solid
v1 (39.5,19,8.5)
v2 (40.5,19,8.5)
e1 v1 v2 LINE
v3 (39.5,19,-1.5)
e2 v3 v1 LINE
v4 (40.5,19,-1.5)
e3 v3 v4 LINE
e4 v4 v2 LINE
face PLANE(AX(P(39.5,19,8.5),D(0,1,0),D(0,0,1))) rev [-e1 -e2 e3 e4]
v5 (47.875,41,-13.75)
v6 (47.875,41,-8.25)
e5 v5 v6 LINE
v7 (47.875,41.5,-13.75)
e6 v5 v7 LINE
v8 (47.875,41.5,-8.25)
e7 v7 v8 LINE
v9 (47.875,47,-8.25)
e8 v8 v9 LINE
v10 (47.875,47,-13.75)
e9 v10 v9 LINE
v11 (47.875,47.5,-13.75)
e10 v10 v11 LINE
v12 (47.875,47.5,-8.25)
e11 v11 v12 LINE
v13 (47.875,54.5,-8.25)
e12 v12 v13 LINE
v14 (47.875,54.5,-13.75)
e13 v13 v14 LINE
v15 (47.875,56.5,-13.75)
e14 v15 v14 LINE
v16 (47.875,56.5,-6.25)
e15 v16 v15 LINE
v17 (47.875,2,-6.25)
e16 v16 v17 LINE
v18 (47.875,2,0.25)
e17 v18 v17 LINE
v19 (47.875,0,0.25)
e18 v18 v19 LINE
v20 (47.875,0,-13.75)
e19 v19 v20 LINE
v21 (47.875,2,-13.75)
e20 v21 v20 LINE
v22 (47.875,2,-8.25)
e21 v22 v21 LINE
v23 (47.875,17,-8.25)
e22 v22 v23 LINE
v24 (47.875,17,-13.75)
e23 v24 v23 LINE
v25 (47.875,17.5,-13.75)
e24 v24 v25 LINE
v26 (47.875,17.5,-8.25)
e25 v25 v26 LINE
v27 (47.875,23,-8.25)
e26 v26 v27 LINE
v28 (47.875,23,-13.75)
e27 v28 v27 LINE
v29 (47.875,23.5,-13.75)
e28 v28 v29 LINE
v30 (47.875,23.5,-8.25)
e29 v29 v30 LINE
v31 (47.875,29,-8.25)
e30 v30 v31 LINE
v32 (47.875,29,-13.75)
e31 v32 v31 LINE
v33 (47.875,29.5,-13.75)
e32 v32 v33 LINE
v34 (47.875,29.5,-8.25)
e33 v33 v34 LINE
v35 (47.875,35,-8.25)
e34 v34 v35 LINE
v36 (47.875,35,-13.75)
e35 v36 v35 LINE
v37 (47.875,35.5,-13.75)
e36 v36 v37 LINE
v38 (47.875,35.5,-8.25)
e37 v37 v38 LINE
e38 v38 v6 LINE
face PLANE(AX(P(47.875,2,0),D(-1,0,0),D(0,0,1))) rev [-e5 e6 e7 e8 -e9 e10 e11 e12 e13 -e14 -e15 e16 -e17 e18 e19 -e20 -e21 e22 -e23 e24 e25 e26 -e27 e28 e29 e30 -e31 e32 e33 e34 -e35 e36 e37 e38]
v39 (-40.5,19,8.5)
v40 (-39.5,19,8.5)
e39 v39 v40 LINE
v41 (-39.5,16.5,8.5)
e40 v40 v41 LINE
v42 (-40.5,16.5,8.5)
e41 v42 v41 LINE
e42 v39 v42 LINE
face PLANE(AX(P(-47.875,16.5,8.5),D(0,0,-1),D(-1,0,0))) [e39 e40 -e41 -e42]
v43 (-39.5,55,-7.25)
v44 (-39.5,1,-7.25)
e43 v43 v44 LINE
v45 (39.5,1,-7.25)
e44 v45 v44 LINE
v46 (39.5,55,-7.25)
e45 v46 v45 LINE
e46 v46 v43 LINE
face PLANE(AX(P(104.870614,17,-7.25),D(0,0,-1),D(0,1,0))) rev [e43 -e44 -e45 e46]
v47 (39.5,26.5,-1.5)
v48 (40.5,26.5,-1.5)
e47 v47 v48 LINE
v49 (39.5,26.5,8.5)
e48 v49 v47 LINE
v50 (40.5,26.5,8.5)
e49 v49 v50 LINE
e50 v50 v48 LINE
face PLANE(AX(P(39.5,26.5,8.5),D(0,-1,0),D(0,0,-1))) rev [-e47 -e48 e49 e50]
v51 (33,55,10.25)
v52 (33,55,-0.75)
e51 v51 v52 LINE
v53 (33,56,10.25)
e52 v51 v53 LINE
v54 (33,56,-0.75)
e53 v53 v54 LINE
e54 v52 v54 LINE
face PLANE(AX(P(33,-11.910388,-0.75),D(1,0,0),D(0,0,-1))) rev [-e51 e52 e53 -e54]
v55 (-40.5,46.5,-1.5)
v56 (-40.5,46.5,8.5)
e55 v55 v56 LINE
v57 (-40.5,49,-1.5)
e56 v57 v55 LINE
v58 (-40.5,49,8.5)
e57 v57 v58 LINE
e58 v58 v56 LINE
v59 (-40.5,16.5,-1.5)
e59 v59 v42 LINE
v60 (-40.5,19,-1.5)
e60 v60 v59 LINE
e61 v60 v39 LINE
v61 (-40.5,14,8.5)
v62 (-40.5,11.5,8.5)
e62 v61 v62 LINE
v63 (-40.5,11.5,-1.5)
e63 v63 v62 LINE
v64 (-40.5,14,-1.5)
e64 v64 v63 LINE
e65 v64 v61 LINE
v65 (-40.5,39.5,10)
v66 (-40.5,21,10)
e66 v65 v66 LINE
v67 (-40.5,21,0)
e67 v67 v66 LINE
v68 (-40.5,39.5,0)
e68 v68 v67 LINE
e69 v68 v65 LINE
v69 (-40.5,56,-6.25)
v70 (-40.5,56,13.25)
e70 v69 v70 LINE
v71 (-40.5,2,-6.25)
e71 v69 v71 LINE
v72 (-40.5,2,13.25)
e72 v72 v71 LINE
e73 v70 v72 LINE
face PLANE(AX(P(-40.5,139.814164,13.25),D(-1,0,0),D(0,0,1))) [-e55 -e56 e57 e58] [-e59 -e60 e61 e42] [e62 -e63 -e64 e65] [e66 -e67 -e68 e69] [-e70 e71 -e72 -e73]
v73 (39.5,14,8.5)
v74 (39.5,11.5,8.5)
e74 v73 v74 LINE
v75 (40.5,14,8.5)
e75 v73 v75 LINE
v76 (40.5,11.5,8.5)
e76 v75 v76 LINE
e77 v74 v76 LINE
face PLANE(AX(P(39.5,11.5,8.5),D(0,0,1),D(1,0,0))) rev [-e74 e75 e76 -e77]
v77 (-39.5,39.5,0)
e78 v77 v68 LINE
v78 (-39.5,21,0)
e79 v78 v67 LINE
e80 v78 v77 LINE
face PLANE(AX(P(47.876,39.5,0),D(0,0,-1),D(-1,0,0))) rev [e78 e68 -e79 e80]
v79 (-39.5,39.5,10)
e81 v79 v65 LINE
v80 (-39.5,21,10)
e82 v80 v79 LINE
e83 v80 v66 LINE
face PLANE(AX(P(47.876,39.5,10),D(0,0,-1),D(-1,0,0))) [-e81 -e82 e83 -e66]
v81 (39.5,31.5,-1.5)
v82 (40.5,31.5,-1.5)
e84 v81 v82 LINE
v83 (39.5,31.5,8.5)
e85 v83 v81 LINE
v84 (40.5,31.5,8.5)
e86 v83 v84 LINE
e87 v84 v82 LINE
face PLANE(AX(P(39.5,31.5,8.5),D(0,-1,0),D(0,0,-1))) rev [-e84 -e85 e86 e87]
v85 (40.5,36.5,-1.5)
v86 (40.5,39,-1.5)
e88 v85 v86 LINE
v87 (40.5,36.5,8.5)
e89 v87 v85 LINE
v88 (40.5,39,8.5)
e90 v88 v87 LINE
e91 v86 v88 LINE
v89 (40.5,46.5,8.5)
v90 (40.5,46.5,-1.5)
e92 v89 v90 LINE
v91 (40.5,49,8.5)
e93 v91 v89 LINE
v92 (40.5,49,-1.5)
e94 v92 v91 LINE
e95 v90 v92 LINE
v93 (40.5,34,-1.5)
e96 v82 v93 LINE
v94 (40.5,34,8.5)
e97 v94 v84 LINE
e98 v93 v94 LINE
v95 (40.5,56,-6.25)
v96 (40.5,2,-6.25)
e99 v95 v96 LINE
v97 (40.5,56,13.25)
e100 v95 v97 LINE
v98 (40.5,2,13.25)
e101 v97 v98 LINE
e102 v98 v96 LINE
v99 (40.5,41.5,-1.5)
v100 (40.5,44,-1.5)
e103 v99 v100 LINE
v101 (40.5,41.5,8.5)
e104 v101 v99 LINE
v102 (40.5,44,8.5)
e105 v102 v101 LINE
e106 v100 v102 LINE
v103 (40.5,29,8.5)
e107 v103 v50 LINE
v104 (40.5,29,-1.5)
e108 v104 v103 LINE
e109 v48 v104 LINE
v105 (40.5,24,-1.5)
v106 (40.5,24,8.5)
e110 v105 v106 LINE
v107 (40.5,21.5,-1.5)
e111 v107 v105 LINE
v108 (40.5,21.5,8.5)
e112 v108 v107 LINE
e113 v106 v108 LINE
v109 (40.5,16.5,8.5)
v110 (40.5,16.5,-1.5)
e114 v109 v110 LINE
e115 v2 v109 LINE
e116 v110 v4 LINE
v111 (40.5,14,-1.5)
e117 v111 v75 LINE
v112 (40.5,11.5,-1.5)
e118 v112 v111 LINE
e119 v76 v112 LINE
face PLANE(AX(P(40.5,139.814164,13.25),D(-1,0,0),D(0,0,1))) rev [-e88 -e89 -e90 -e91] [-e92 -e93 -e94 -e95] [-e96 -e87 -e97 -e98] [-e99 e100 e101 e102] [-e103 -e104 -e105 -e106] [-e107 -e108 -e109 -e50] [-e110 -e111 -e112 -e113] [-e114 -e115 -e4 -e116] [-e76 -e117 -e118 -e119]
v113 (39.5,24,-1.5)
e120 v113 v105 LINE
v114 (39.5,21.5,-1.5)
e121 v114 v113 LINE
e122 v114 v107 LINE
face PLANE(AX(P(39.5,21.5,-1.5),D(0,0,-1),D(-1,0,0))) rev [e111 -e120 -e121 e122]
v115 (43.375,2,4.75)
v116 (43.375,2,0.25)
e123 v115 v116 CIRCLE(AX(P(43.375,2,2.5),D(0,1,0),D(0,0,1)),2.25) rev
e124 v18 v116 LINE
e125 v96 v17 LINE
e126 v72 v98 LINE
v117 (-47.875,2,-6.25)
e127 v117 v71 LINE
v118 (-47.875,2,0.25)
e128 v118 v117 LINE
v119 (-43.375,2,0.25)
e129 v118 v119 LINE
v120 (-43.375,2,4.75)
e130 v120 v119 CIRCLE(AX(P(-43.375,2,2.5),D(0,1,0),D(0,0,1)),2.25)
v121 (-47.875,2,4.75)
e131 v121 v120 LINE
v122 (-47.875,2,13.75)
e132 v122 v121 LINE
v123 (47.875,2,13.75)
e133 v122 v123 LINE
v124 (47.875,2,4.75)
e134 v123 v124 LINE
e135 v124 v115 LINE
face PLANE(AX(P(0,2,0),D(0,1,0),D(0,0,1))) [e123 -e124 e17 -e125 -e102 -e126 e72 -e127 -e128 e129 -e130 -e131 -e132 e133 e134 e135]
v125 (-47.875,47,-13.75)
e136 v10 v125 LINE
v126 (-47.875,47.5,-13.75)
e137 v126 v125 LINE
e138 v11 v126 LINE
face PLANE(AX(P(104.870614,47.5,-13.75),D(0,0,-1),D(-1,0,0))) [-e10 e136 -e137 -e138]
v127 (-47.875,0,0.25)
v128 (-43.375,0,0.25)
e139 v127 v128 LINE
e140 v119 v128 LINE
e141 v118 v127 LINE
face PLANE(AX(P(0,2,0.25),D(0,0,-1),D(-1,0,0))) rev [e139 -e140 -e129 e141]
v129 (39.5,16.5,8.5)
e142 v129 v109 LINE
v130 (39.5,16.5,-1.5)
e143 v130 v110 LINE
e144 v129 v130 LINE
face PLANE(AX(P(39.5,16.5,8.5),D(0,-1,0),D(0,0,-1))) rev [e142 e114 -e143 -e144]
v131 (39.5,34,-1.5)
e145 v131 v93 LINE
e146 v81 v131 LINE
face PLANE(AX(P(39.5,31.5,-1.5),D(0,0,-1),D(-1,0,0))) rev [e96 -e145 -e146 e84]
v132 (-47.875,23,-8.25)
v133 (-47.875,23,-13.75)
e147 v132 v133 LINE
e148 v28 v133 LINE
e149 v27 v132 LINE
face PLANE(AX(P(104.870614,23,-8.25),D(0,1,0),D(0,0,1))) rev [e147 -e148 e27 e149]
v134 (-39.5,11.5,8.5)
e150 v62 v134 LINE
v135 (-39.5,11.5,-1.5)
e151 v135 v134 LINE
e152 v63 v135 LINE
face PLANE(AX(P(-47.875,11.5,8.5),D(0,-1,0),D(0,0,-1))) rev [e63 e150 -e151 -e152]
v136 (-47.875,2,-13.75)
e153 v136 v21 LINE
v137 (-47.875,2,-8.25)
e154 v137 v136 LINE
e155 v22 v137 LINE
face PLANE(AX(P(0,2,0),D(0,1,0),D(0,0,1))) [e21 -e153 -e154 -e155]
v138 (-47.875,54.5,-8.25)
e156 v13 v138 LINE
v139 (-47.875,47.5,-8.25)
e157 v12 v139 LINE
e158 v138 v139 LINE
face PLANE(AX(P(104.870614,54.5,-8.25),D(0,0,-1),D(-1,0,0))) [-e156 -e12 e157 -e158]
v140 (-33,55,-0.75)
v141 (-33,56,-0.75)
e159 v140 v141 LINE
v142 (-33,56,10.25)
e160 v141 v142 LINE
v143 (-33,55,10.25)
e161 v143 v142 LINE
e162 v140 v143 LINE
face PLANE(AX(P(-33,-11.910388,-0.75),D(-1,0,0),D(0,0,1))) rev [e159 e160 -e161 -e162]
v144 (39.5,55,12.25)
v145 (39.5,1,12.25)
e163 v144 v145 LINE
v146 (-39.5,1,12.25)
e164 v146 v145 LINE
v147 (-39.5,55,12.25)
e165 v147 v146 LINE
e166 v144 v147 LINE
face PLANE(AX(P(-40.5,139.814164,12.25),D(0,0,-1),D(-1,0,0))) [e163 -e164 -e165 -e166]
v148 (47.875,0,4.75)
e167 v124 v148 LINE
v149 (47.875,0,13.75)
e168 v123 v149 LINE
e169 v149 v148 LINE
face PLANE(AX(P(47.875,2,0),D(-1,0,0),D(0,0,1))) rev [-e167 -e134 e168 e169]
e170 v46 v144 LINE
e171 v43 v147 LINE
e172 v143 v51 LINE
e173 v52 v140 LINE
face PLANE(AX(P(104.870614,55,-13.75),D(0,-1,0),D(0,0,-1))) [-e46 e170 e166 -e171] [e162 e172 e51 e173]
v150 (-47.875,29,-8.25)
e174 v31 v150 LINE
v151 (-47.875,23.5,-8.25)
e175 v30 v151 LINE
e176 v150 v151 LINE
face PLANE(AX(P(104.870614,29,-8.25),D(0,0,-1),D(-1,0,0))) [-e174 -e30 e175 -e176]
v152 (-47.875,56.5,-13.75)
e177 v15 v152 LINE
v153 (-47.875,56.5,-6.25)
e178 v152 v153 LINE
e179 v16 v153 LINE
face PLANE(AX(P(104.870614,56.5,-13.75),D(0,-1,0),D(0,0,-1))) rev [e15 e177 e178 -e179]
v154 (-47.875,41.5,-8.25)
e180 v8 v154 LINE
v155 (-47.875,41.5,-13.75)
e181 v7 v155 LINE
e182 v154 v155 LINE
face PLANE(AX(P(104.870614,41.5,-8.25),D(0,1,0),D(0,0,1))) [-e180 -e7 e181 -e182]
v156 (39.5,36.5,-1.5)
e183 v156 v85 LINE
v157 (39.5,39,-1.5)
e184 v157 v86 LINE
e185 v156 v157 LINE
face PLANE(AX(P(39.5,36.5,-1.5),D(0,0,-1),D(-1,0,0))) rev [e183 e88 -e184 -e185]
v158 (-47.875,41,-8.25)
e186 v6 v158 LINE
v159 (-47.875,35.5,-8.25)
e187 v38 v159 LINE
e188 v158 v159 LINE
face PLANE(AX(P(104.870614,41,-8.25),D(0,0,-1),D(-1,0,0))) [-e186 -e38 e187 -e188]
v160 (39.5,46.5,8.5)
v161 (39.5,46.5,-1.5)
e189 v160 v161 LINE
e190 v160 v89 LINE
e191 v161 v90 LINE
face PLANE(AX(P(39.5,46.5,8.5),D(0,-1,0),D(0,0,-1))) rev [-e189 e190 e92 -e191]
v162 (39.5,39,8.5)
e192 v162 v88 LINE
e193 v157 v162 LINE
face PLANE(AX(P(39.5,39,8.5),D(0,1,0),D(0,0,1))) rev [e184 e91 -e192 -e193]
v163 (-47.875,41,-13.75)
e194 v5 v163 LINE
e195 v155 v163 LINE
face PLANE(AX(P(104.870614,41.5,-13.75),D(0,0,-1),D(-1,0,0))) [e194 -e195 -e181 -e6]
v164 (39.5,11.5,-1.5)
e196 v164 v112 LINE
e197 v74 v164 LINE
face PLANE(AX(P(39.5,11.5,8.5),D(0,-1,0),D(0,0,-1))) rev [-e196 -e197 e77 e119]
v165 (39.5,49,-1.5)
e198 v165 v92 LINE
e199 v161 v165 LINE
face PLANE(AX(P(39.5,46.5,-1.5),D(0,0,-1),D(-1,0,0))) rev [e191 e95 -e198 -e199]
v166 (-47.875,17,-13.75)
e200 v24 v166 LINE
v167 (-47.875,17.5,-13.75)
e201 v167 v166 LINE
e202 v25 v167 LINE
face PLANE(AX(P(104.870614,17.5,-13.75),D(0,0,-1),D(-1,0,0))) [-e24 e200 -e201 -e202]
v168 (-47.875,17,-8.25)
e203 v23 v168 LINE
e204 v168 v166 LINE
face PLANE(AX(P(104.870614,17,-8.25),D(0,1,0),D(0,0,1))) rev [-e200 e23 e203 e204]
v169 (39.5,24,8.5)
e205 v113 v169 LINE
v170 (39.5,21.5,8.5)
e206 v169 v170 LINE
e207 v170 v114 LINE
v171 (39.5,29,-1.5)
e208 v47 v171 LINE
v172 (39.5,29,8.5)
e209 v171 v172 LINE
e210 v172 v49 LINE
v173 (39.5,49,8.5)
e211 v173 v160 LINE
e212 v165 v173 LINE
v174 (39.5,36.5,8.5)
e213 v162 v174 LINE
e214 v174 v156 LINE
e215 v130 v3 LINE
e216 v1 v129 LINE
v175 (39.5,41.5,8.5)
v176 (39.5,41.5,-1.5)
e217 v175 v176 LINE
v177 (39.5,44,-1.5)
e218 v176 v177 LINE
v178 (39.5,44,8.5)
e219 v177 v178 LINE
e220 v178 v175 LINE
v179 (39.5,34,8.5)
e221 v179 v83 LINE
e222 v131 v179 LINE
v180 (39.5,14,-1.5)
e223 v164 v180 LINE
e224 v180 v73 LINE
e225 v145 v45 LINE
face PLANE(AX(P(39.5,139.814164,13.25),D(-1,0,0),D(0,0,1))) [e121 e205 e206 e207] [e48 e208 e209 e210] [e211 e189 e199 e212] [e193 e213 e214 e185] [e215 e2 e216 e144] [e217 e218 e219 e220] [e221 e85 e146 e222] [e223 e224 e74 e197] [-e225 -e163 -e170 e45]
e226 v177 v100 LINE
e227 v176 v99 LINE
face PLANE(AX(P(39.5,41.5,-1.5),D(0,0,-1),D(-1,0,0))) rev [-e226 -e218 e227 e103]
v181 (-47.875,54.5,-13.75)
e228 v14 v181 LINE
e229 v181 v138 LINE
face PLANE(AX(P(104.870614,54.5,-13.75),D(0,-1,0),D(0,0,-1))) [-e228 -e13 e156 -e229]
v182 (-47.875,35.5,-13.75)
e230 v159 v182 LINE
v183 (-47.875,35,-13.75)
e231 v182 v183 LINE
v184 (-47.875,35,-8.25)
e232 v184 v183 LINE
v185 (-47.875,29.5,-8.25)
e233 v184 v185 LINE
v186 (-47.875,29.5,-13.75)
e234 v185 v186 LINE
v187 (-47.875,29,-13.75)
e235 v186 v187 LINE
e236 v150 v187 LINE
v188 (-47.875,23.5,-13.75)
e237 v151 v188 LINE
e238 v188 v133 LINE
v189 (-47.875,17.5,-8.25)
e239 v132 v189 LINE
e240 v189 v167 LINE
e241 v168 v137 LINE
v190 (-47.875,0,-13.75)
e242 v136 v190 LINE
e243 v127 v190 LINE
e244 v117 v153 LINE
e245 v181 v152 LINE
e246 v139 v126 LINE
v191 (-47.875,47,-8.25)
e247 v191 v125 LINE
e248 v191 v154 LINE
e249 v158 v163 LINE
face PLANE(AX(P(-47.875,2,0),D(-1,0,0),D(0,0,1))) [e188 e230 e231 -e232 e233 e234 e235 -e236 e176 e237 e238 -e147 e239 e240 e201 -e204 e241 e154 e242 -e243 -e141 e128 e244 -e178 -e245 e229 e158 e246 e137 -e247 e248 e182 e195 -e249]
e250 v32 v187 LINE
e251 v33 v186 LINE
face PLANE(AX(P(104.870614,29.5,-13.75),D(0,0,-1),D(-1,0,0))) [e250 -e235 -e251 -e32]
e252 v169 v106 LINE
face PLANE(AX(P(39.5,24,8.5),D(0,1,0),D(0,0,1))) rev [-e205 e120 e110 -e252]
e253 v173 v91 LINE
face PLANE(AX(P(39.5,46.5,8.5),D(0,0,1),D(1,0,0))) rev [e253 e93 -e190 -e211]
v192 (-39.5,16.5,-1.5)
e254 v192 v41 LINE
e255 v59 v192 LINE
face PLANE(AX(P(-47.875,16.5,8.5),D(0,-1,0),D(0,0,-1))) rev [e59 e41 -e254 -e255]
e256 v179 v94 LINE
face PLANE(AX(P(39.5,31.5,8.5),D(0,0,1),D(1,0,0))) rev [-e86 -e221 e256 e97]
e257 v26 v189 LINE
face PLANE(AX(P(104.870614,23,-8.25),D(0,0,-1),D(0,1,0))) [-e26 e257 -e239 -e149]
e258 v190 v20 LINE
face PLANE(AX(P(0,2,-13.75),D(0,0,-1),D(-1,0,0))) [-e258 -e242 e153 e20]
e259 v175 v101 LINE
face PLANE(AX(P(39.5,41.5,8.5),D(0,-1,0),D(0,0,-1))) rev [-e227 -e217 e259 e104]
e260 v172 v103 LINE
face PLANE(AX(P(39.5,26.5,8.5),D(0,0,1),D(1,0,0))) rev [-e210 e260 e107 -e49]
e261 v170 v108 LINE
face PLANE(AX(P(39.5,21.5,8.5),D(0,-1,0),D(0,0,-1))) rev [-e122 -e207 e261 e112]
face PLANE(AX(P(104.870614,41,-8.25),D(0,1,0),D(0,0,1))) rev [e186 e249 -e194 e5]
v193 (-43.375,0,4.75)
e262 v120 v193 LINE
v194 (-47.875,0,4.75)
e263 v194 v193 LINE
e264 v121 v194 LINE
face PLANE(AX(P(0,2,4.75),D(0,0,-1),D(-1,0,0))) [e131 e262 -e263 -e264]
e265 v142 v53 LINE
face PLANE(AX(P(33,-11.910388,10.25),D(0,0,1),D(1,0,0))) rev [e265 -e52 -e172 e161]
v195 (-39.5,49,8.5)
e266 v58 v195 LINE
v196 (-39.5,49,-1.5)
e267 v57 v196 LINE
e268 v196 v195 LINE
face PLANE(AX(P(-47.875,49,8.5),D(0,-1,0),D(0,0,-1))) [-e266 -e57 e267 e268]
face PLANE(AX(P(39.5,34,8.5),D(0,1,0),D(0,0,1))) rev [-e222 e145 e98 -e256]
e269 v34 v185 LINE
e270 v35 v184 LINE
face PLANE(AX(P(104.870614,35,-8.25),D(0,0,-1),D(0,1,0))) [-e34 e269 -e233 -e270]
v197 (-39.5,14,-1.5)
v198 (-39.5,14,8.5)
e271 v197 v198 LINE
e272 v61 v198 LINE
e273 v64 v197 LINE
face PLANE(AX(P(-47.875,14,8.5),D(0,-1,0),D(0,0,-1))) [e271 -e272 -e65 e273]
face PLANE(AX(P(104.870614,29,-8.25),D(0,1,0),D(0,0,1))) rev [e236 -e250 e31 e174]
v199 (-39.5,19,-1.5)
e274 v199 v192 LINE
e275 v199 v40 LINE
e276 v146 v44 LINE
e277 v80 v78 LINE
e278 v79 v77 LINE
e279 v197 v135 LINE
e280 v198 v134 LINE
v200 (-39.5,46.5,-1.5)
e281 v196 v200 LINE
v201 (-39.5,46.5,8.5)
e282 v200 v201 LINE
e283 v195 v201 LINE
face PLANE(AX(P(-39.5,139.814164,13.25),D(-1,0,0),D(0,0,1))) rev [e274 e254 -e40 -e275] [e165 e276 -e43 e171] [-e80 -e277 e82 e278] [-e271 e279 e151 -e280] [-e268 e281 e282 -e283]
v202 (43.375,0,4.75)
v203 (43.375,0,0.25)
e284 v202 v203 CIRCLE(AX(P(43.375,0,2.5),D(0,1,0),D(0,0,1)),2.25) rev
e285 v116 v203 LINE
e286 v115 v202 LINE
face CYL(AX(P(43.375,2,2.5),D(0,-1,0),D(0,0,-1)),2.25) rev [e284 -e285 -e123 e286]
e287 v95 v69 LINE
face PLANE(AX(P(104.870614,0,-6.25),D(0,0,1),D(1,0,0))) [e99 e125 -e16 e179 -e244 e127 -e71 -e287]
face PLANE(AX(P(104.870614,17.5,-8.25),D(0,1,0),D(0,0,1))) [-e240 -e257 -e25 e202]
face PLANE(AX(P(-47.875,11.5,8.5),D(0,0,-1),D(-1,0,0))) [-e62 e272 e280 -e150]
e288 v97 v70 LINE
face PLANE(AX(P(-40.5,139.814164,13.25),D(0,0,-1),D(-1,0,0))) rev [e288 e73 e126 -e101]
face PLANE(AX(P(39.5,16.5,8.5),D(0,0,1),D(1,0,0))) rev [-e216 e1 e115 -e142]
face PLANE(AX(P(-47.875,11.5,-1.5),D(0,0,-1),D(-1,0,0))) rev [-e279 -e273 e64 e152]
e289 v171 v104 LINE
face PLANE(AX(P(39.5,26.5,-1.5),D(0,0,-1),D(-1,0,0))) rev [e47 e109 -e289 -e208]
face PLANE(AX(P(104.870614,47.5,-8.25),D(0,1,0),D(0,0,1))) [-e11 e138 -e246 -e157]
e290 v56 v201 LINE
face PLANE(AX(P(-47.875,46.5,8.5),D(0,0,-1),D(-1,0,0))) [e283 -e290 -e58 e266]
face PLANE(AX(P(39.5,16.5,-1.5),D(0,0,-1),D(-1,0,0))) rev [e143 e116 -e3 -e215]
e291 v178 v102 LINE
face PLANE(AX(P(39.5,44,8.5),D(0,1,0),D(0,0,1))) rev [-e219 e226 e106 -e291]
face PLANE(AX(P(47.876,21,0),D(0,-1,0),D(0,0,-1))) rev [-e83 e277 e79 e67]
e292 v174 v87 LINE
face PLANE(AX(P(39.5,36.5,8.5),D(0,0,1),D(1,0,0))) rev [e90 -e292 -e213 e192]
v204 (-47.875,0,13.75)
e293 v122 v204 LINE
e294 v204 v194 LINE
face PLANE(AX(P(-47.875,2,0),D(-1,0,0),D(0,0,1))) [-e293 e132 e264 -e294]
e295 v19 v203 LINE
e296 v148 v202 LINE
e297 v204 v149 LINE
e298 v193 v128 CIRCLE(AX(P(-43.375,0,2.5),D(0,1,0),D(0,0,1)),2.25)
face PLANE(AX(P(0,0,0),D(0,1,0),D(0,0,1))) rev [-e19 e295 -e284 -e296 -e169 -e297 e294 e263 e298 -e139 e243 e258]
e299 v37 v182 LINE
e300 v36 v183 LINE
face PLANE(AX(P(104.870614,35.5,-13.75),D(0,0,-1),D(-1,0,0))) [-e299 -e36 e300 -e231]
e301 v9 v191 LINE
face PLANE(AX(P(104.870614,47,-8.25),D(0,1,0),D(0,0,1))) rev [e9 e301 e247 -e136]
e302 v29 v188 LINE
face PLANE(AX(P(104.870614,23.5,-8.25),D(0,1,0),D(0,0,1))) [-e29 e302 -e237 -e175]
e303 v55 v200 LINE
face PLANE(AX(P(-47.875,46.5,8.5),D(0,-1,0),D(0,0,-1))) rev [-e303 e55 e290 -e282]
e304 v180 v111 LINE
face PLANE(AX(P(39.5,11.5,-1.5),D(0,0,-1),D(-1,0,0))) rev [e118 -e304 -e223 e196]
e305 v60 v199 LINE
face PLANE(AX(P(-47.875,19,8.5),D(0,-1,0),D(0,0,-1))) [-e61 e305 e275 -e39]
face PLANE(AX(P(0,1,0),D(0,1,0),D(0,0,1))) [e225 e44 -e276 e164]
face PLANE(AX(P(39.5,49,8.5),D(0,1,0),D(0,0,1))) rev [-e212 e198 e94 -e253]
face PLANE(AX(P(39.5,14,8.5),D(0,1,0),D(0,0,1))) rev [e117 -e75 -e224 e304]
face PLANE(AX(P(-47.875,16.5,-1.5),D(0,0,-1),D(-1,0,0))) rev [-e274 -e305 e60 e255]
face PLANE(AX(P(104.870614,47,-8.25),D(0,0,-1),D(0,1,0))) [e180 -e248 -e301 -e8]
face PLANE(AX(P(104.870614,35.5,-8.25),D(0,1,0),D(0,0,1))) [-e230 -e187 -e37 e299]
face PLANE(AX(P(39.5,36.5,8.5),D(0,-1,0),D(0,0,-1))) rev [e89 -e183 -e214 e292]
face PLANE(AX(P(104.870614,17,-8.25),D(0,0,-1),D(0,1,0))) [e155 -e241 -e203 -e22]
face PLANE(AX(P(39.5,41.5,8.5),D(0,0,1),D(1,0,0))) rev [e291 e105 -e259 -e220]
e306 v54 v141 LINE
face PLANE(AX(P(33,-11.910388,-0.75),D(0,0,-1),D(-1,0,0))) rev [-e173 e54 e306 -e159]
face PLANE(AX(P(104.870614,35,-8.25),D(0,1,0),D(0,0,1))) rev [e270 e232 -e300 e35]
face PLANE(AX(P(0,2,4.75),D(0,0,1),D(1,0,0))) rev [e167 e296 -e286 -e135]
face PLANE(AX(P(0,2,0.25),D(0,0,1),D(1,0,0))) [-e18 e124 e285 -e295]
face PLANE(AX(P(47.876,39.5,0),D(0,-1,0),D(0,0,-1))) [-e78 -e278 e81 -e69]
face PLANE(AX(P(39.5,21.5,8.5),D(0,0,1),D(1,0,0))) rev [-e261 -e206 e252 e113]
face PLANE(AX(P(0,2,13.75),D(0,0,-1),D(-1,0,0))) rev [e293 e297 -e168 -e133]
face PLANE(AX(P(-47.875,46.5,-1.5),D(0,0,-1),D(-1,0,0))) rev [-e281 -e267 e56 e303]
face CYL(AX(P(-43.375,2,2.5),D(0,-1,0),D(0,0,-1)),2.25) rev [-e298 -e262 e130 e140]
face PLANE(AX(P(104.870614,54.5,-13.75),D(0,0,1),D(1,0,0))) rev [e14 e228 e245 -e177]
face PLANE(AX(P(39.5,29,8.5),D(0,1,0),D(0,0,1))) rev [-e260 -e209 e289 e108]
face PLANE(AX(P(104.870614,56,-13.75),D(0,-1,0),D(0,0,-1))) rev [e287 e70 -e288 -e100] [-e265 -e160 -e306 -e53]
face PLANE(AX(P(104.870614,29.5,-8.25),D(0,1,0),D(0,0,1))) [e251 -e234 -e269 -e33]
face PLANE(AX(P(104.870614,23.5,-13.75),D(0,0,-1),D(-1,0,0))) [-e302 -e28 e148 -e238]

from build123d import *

# Parameters (mm, degrees)
BOSS_EXTRUDE1_DEPTH = 2
BOSS_EXTRUDE4_DEPTH = 95.75
SKETCH3_W           = 81
SKETCH3_H           = 19.5
BOSS_EXTRUDE5_DEPTH = 54
SKETCH4_W           = 10
SKETCH4_H           = 2.5
CUT_EXTRUDE1_DEPTH  = 1
SHELL1_START        = -39.5
SHELL1_OUTLINE_W    = 54
SHELL1_OUTLINE_H    = 19.5
SHELL1_DEPTH        = 79
SKETCH4_2_W         = 10
SKETCH4_2_H         = 2.5
CUT_EXTRUDE2_DEPTH  = 106.789664547
CUT_EXTRUDE3_REACH  = 107.79
SKETCH5_W           = 10
SKETCH5_H           = 18.5
SKETCH6_W           = 66
SKETCH6_H           = 11
CUT_EXTRUDE4_DEPTH  = 1


# Read off the part's stored shape, not the designer's step: Shell1
with BuildPart() as part:
    # Sketch1 → Boss-Extrude1 (new body)
    with BuildSketch(Plane(origin=(0, 0, 0), x_dir=(1, 0, 0), z_dir=(0, 1, 0))):
        with BuildLine():
            Line((-47.875, -4.75), (-47.875, -13.75))
            Line((-47.875, -13.75), (47.875, -13.75))
            Line((47.875, -13.75), (47.875, -4.75))
            Line((47.875, -4.75), (43.375, -4.75))
            ThreePointArc((43.375, -4.75), (41.125, -2.5), (43.375, -0.25))
            Line((43.375, -0.25), (47.875, -0.25))
            Line((47.875, -0.25), (47.875, 13.75))
            Line((47.875, 13.75), (-47.875, 13.75))
            Line((-47.875, 13.75), (-47.875, -0.25))
            Line((-47.875, -0.25), (-43.375, -0.25))
            ThreePointArc((-43.375, -0.25), (-41.125, -2.5), (-43.375, -4.75))
            Line((-43.375, -4.75), (-47.875, -4.75))
        make_face()
    extrude(amount=BOSS_EXTRUDE1_DEPTH)

    # Sketch2 → Boss-Extrude4 (add)
    with BuildSketch(Plane.ZY.offset(47.875)):
        Polygon((-13.75, 0), (-6.25, 0), (-6.25, 56.5), (-13.75, 56.5), (-13.75, 54.5), (-8.25, 54.5), (-8.25, 47.5), (-13.75, 47.5), (-13.75, 47), (-8.25, 47), (-8.25, 41.5), (-13.75, 41.5), (-13.75, 41), (-8.25, 41), (-8.25, 35.5), (-13.75, 35.5), (-13.75, 35), (-8.25, 35), (-8.25, 29.5), (-13.75, 29.5), (-13.75, 29), (-8.25, 29), (-8.25, 23.5), (-13.75, 23.5), (-13.75, 23), (-8.25, 23), (-8.25, 17.5), (-13.75, 17.5), (-13.75, 17), (-8.25, 17), (-8.25, 2), (-13.75, 2), align=None)
    extrude(amount=-BOSS_EXTRUDE4_DEPTH)

    # Sketch3 → Boss-Extrude5 (add)
    with BuildSketch(Plane(origin=(0, 2, 0), x_dir=(1, 0, 0), z_dir=(0, 1, 0))):
        with Locations((0, -3.5)):
            Rectangle(SKETCH3_W, SKETCH3_H)
    extrude(amount=BOSS_EXTRUDE5_DEPTH)

    # Sketch4 → Cut-Extrude1 (cut)
    with BuildSketch(Plane(origin=(40.5, 0, 0), x_dir=(0, 0, -1), z_dir=(1, 0, 0))):
        with Locations((-3.5, 47.75)):
            Rectangle(SKETCH4_W, SKETCH4_H)
        with Locations((-3.5, 42.75)):
            Rectangle(SKETCH4_W, SKETCH4_H)
        with Locations((-3.5, 37.75)):
            Rectangle(SKETCH4_W, SKETCH4_H)
        with Locations((-3.5, 32.75)):
            Rectangle(SKETCH4_W, SKETCH4_H)
        with Locations((-3.5, 27.75)):
            Rectangle(SKETCH4_W, SKETCH4_H)
        with Locations((-3.5, 22.75)):
            Rectangle(SKETCH4_W, SKETCH4_H)
        with Locations((-3.5, 17.75)):
            Rectangle(SKETCH4_W, SKETCH4_H)
        with Locations((-3.5, 12.75)):
            Rectangle(SKETCH4_W, SKETCH4_H)
    extrude(amount=-CUT_EXTRUDE1_DEPTH, mode=Mode.SUBTRACT)

    # Shell1 outline → Shell1 (cut)
    with BuildSketch(Plane.YZ.offset(SHELL1_START)):
        with Locations((28, 2.5)):
            Rectangle(SHELL1_OUTLINE_W, SHELL1_OUTLINE_H)
    extrude(amount=SHELL1_DEPTH, mode=Mode.SUBTRACT)

    # Sketch4<2> → Cut-Extrude2 (cut, through all)
    with BuildSketch(Plane(origin=(40.5, 0, 0), x_dir=(0, 0, -1), z_dir=(1, 0, 0))):
        with Locations((-3.5, 47.75)):
            Rectangle(SKETCH4_2_W, SKETCH4_2_H)
        with Locations((-3.5, 17.75)):
            Rectangle(SKETCH4_2_W, SKETCH4_2_H)
        with Locations((-3.5, 12.75)):
            Rectangle(SKETCH4_2_W, SKETCH4_2_H)
    extrude(amount=-CUT_EXTRUDE2_DEPTH, mode=Mode.SUBTRACT)

    # Sketch5 → Cut-Extrude3 (cut, up to next)
    with BuildSketch(Plane.ZY.offset(40.5), mode=Mode.PRIVATE) as cut_extrude3_sk1:
        with Locations((5, 30.25)):
            Rectangle(SKETCH5_W, SKETCH5_H)
    cut_extrude3_tool1 = extrude(cut_extrude3_sk1.sketch, amount=-CUT_EXTRUDE3_REACH, mode=Mode.PRIVATE) & part.part
    add(cut_extrude3_tool1.solids().sort_by_distance((-40.5, 30.25, 5))[0], mode=Mode.SUBTRACT)

    # Sketch6 → Cut-Extrude4 (cut)
    with BuildSketch(Plane(origin=(0, 56, 0), x_dir=(1, 0, 0), z_dir=(0, 1, 0))):
        with Locations((0, -4.75)):
            Rectangle(SKETCH6_W, SKETCH6_H)
    extrude(amount=-CUT_EXTRUDE4_DEPTH, mode=Mode.SUBTRACT)


solid = part.part
